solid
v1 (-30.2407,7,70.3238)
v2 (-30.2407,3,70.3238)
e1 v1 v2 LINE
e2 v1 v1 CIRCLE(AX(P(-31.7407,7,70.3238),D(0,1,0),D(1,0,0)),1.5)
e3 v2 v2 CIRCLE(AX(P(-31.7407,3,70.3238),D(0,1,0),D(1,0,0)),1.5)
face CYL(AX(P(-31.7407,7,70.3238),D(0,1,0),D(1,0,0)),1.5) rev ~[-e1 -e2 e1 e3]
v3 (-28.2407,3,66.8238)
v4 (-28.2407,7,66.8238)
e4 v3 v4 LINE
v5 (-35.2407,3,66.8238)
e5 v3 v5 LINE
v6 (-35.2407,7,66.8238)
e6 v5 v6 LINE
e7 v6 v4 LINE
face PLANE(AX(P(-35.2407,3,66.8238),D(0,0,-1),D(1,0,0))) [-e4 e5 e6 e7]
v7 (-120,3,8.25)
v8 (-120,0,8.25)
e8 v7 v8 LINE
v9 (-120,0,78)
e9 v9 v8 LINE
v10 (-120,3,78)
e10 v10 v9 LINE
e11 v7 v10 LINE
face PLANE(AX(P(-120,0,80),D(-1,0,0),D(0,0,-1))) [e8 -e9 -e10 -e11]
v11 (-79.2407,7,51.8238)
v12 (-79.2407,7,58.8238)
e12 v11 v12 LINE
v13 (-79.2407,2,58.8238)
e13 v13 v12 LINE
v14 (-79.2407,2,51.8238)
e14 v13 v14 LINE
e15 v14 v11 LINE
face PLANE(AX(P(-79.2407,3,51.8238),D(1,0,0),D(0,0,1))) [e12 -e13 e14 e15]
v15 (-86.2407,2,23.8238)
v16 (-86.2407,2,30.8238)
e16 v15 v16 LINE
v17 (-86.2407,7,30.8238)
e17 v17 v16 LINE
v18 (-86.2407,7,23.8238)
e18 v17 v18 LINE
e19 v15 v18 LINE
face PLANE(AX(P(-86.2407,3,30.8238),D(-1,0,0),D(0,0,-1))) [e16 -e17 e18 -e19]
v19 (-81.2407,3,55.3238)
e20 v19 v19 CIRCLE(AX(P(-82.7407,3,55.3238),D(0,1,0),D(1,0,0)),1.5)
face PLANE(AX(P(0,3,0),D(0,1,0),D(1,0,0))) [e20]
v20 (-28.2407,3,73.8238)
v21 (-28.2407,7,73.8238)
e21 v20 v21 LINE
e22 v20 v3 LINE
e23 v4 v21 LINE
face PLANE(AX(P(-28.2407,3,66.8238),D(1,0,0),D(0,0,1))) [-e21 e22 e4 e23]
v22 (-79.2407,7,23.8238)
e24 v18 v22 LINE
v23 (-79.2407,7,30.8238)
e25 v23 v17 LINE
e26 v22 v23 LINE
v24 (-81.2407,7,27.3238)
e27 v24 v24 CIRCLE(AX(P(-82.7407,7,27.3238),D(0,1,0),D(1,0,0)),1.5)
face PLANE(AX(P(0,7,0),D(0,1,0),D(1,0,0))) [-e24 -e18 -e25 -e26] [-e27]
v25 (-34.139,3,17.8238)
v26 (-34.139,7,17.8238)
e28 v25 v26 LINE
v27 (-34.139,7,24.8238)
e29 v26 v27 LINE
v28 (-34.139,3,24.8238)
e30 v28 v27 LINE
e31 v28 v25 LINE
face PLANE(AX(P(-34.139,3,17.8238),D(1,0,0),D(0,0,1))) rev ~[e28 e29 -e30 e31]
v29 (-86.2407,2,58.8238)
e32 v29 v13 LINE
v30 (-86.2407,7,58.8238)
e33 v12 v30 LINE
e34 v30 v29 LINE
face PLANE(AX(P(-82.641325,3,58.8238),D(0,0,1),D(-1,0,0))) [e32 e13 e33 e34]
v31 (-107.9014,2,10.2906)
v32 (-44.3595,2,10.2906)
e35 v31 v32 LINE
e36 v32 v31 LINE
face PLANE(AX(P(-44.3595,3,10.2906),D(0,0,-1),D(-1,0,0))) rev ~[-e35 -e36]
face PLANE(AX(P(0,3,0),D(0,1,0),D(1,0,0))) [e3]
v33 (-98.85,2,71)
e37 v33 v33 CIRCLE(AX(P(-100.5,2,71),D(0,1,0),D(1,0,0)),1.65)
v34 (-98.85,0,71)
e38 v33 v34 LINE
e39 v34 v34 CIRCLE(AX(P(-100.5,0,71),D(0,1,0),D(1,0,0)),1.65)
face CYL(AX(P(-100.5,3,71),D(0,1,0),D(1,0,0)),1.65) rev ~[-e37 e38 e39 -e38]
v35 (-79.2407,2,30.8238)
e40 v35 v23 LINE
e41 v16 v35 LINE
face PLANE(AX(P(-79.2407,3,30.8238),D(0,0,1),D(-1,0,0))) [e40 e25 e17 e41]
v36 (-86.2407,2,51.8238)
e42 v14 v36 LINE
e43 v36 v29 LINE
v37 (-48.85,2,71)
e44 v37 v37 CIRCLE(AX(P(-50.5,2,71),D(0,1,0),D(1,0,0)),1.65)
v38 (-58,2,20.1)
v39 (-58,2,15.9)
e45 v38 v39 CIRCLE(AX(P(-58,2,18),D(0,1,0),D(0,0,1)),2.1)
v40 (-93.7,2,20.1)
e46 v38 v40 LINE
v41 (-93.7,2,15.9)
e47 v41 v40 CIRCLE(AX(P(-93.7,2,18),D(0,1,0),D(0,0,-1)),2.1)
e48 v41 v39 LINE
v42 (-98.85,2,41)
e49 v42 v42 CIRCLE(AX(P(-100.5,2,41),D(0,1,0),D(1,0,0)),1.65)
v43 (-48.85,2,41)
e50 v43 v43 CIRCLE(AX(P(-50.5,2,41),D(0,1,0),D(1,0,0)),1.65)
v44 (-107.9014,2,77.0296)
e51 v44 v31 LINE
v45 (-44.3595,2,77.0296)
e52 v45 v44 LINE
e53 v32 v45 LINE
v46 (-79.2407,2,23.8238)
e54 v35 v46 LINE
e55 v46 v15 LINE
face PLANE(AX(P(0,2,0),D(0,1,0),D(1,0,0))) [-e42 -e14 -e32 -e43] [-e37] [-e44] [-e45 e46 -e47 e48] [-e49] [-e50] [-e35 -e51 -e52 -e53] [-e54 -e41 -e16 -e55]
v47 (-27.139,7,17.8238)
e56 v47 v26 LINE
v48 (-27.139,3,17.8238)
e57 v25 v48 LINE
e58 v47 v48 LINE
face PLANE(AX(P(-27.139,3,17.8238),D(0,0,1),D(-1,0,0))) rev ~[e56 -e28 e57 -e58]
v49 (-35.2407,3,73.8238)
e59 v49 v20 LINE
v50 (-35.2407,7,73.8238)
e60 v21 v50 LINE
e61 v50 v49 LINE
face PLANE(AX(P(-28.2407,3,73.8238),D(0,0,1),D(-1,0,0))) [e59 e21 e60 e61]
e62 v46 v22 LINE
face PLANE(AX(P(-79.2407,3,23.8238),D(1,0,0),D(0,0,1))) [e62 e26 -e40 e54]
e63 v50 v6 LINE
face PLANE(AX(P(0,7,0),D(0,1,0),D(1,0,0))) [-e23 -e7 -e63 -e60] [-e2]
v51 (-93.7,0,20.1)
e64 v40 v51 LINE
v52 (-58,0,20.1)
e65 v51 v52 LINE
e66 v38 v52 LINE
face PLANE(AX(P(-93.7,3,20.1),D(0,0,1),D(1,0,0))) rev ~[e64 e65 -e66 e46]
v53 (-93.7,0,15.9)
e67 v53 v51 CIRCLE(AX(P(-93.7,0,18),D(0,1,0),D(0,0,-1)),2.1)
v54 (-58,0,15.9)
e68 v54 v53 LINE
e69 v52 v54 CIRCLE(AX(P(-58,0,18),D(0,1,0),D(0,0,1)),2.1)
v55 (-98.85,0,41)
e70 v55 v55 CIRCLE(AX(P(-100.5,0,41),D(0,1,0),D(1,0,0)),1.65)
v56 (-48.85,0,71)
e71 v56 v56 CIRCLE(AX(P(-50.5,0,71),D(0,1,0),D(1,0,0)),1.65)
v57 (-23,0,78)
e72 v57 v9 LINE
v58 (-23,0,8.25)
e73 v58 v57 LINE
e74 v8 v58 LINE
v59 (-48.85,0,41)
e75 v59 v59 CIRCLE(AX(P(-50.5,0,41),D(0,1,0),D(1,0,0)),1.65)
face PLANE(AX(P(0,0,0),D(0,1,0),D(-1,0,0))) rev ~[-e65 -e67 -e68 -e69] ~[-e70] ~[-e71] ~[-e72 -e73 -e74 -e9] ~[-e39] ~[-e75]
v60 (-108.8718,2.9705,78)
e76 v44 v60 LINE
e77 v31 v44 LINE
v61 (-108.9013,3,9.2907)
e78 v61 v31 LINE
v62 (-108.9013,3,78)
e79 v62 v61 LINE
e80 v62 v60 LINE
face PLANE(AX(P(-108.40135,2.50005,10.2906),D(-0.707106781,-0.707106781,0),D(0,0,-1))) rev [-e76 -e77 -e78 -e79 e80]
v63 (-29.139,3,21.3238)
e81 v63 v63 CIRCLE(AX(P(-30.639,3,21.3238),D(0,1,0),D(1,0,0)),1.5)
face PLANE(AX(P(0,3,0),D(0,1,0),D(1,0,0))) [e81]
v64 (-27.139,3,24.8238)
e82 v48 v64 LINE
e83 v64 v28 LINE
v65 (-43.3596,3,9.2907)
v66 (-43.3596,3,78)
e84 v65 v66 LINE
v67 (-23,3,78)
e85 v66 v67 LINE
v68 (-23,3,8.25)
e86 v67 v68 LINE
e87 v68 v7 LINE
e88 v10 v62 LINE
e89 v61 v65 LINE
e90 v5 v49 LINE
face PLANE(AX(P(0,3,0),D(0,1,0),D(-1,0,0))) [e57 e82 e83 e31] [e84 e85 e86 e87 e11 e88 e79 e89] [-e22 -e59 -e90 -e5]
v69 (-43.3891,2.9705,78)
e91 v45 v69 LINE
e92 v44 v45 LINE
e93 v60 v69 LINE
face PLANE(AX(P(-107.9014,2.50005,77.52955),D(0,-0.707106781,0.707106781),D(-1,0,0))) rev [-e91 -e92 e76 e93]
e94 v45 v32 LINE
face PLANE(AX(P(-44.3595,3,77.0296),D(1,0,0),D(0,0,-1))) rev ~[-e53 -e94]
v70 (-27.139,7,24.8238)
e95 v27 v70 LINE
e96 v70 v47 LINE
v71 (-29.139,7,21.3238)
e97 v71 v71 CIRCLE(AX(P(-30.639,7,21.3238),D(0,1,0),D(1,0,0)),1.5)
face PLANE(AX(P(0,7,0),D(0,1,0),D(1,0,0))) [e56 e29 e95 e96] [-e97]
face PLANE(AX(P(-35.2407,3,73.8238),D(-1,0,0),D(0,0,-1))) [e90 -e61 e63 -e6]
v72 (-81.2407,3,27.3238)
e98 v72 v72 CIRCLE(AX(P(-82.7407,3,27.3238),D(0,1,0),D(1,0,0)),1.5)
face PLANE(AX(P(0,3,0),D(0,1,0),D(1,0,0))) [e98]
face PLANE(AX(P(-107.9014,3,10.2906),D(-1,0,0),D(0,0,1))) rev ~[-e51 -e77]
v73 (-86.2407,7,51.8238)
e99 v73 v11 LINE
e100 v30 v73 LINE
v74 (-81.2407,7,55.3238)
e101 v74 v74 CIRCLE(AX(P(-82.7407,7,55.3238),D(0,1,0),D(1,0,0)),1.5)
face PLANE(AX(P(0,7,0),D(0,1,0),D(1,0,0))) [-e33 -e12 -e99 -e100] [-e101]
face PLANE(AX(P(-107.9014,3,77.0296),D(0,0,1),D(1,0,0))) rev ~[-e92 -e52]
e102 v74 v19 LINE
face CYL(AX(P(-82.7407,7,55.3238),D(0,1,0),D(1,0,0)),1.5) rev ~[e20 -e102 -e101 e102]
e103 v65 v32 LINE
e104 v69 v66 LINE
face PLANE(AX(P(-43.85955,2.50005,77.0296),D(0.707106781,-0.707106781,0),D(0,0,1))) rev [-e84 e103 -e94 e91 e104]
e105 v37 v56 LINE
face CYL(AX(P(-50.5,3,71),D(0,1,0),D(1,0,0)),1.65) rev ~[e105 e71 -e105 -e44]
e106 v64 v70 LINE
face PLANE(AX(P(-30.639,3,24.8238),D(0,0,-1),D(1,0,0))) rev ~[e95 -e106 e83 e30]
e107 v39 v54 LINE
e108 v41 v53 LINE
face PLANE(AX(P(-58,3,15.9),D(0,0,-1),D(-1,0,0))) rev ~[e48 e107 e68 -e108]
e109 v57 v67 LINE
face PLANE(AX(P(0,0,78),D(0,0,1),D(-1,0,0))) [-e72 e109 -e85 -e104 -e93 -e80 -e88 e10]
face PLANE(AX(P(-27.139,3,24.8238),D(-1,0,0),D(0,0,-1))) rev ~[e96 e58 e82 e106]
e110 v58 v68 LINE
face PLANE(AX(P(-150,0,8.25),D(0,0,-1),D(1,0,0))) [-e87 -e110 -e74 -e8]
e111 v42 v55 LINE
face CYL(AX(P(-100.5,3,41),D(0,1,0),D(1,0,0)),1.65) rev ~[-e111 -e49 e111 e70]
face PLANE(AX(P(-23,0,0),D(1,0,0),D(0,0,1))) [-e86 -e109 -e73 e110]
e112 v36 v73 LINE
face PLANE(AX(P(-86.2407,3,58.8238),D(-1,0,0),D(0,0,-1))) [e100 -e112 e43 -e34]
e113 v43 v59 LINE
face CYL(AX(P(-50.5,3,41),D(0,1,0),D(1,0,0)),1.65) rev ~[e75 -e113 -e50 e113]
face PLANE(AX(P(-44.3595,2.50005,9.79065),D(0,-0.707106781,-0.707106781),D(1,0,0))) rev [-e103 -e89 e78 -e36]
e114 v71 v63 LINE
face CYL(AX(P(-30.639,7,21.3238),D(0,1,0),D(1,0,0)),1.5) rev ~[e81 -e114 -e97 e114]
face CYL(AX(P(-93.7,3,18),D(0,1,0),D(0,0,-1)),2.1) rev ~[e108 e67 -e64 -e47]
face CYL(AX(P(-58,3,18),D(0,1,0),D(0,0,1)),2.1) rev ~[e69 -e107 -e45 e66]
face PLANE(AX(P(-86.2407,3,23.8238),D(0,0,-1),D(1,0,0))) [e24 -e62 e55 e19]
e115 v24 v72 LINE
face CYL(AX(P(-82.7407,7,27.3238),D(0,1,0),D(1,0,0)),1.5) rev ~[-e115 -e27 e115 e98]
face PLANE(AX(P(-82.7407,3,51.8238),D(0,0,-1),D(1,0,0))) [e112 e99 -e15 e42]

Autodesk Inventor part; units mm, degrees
ref_plane "YZ Plane" through (0, 0, 0) normal (1, 0, 0) x (0, 1, 0)
ref_plane "XZ Plane" through (0, 0, 0) normal (0, 1, 0) x (-1, 0, 0)
ref_plane "XY Plane" through (0, 0, 0) normal (0, 0, 1) x (1, 0, 0)
sketch "Sketch1" plane through (0, 0, 0) normal (0, 1, 0) x (-1, 0, 0)
  line L0 (0, 80) -> (150, 80)
  line L1 (150, 80) -> (150, 0)
  line L2 (150, 0) -> (0, 0)
  line L3 (0, 0) -> (0, 80)
  point P0 (0, 0)
  dimension "d0" = 150
  dimension "d1" = 80
extrude "Extrusion1" add sketch "Sketch1" along normal blind 3
sketch "Sketch2" plane through (0, 3, 0) normal (0, 1, 0) x (1, 0, 0)
  line L0 (-93.7, -18) -> (-58, -18)
  line L1 (-93.7, -18) -> (-58, -18) construction
  line L2 (-93.7, -20.1) -> (-58, -20.1)
  line L3 (-58, -15.9) -> (-93.7, -15.9)
  arc A0 (-93.7, -15.9) -> (-93.7, -20.1) centre (-93.7, -18) ccw
  arc A1 (-58, -20.1) -> (-58, -15.9) centre (-58, -18) ccw
  circle A2 centre (-100.5, -71) radius 1.65
  circle A3 centre (-100.5, -41) radius 1.65
  circle A4 centre (-50.5, -71) radius 1.65
  circle A5 centre (-50.5, -41) radius 1.65
  point P0 (0, 0)
  point P1 (-50.5, -18)
  point P2 (-92, -41)
  point P3 (-92, -71)
  point P4 (-75.85, -18)
  dimension "d4" = 4.2
  dimension "d5" = 3.3
  dimension "d6" = 3.3
  dimension "d7" = 3.3
  dimension "d8" = 3.3
extrude "Extrusion2" cut sketch "Sketch2" against normal blind 3
sketch "Sketch3" plane through (0, 3, 0) normal (0, 1, 0) x (1, 0, 0)
  line L0 (-107.9014, -77.0296) -> (-44.3595, -77.0296)
  line L1 (-44.3595, -77.0296) -> (-44.3595, -10.2906)
  line L2 (-44.3595, -10.2906) -> (-107.9014, -10.2906)
  line L3 (-107.9014, -10.2906) -> (-107.9014, -77.0296)
  point P0 (0, 0)
extrude "Extrusion3" cut sketch "Sketch3" against normal blind 1
chamfer "Chamfer1" distance 1 angle 45 4 edges at (-107.9014, 3, 43.6601) (-76.1304, 3, 10.2906) (-44.3595, 3, 43.6601) (-76.1304, 3, 77.0296)
sketch "Sketch4" plane through (0, 3, 0) normal (0, 1, 0) x (1, 0, 0)
  line L0 (-83.7407, -25.8238) -> (-30.7407, -25.8238)
  line L1 (-30.639, -72.8238) -> (-31.7407, -72.8238)
  line L2 (-31.7407, -70.3238) -> (-30.7407, -70.3238)
  line L3 (-30.639, -70.3238) -> (-30.639, -72.8238)
  line L4 (-27.139, -17.8238) -> (-34.139, -17.8238)
  line L5 (-34.139, -17.8238) -> (-34.139, -24.8238)
  line L6 (-34.139, -24.8238) -> (-27.139, -24.8238)
  line L7 (-27.139, -24.8238) -> (-27.139, -17.8238)
  line L8 (-27.139, -17.8238) -> (-34.139, -24.8238) construction
  line L9 (-34.139, -17.8238) -> (-27.139, -24.8238) construction
  line L10 (-28.2407, -73.8238) -> (-35.2407, -73.8238)
  line L11 (-35.2407, -73.8238) -> (-35.2407, -66.8238)
  line L12 (-35.2407, -66.8238) -> (-28.2407, -66.8238)
  line L13 (-28.2407, -66.8238) -> (-28.2407, -73.8238)
  line L14 (-28.2407, -73.8238) -> (-35.2407, -66.8238) construction
  line L15 (-35.2407, -73.8238) -> (-28.2407, -66.8238) construction
  line L16 (-30.639, -24.8238) -> (-82.7407, -24.8238)
  line L17 (-30.639, -58.4962) -> (-30.639, -24.8238)
  line L18 (-82.639, -58.4962) -> (-82.7407, -72.8238)
  line L19 (-82.7407, -72.8238) -> (-82.7407, -56.8238)
  line L20 (-82.7407, -56.8238) -> (-82.7407, -55.3238)
  line L21 (-79.2407, -58.8238) -> (-86.2407, -58.8238)
  line L22 (-86.2407, -58.8238) -> (-86.2407, -51.8238)
  line L23 (-86.2407, -51.8238) -> (-79.2407, -51.8238)
  line L24 (-79.2407, -51.8238) -> (-79.2407, -58.8238)
  line L25 (-79.2407, -58.8238) -> (-86.2407, -51.8238) construction
  line L26 (-86.2407, -58.8238) -> (-79.2407, -51.8238) construction
  line L27 (-82.7407, -55.3238) -> (-82.7407, -27.3238)
  line L28 (-79.2407, -30.8238) -> (-86.2407, -30.8238)
  line L29 (-86.2407, -30.8238) -> (-86.2407, -23.8238)
  line L30 (-86.2407, -23.8238) -> (-79.2407, -23.8238)
  line L31 (-79.2407, -23.8238) -> (-79.2407, -30.8238)
  line L32 (-79.2407, -30.8238) -> (-86.2407, -23.8238) construction
  line L33 (-86.2407, -30.8238) -> (-79.2407, -23.8238) construction
  point P0 (0, 0)
extrude "Extrusion4" add sketch "Sketch4" along normal blind 4 and the other way blind 2 contours L7 L6 L5 L4 | L10 L11 L12 L13 | L21 L19 L20 L27 L23 L24 | L21 L22 L23 L27 L20 L19 | L28 L29 L30 L31
sketch "Sketch6" plane through (0, 7, 0) normal (0, 1, 0) x (1, 0, 0)
  line L0 (-86.2407, -51.8238) -> (-79.2407, -51.8238) projected
  line L1 (-79.2407, -51.8238) -> (-79.2407, -58.8238) projected
  line L2 (-86.2407, -51.8238) -> (-79.2407, -58.8238)
  line L3 (-86.2407, -30.8238) -> (-86.2407, -23.8238) projected
  line L4 (-86.2407, -30.8238) -> (-79.2407, -30.8238) projected
  line L5 (-86.2407, -23.8238) -> (-79.2407, -30.8238)
  line L6 (-34.139, -17.8238) -> (-27.139, -17.8238) projected
  line L7 (-27.139, -17.8238) -> (-27.139, -24.8238) projected
  line L8 (-34.139, -17.8238) -> (-27.139, -24.8238)
  line L9 (-35.2407, -73.8238) -> (-35.2407, -66.8238) projected
  line L10 (-28.2407, -73.8238) -> (-28.2407, -66.8238) projected
  line L11 (-35.2407, -66.8238) -> (-28.2407, -73.8238)
  circle A0 centre (-82.7407, -55.3238) radius 1.5
  circle A1 centre (-82.7407, -27.3238) radius 1.5
  circle A2 centre (-30.639, -21.3238) radius 1.5
  circle A3 centre (-31.7407, -70.3238) radius 1.5
  point P0 (0, 0)
  point P1 (-123.6624, -66.5994)
  point P2 (-116.6624, -73.5994)
  point P3 (-117.764, -24.5994)
  point P4 (-117.764, -17.5994)
  point P5 (-124.764, -17.5994)
  point P6 (-72.6624, -51.5994)
  dimension "d45" = 3
  dimension "d46" = 3
  dimension "d47" = 3
  dimension "d48" = 3
extrude "Extrusion5" cut sketch "Sketch6" against normal blind 4 contours A0 L2 | L2 A0 | A1 L5 | L5 A1 | A2 L8 | L8 A2 | A3 L11 | L11 A3
move faces "Move1" translate (-23, 0, 0) faces at (0, 1, 53.3333)
move faces "Move2" translate (0, 0, 8.25) faces at (-65.3333, 1, 0)
move faces "Move3" translate (0, 0, -2) faces at (-107.6667, 2, 80)
move faces "Move4" translate (30, 0, 0) faces at (-150, 1, 31.5)
properties part number "TOPLeft"
